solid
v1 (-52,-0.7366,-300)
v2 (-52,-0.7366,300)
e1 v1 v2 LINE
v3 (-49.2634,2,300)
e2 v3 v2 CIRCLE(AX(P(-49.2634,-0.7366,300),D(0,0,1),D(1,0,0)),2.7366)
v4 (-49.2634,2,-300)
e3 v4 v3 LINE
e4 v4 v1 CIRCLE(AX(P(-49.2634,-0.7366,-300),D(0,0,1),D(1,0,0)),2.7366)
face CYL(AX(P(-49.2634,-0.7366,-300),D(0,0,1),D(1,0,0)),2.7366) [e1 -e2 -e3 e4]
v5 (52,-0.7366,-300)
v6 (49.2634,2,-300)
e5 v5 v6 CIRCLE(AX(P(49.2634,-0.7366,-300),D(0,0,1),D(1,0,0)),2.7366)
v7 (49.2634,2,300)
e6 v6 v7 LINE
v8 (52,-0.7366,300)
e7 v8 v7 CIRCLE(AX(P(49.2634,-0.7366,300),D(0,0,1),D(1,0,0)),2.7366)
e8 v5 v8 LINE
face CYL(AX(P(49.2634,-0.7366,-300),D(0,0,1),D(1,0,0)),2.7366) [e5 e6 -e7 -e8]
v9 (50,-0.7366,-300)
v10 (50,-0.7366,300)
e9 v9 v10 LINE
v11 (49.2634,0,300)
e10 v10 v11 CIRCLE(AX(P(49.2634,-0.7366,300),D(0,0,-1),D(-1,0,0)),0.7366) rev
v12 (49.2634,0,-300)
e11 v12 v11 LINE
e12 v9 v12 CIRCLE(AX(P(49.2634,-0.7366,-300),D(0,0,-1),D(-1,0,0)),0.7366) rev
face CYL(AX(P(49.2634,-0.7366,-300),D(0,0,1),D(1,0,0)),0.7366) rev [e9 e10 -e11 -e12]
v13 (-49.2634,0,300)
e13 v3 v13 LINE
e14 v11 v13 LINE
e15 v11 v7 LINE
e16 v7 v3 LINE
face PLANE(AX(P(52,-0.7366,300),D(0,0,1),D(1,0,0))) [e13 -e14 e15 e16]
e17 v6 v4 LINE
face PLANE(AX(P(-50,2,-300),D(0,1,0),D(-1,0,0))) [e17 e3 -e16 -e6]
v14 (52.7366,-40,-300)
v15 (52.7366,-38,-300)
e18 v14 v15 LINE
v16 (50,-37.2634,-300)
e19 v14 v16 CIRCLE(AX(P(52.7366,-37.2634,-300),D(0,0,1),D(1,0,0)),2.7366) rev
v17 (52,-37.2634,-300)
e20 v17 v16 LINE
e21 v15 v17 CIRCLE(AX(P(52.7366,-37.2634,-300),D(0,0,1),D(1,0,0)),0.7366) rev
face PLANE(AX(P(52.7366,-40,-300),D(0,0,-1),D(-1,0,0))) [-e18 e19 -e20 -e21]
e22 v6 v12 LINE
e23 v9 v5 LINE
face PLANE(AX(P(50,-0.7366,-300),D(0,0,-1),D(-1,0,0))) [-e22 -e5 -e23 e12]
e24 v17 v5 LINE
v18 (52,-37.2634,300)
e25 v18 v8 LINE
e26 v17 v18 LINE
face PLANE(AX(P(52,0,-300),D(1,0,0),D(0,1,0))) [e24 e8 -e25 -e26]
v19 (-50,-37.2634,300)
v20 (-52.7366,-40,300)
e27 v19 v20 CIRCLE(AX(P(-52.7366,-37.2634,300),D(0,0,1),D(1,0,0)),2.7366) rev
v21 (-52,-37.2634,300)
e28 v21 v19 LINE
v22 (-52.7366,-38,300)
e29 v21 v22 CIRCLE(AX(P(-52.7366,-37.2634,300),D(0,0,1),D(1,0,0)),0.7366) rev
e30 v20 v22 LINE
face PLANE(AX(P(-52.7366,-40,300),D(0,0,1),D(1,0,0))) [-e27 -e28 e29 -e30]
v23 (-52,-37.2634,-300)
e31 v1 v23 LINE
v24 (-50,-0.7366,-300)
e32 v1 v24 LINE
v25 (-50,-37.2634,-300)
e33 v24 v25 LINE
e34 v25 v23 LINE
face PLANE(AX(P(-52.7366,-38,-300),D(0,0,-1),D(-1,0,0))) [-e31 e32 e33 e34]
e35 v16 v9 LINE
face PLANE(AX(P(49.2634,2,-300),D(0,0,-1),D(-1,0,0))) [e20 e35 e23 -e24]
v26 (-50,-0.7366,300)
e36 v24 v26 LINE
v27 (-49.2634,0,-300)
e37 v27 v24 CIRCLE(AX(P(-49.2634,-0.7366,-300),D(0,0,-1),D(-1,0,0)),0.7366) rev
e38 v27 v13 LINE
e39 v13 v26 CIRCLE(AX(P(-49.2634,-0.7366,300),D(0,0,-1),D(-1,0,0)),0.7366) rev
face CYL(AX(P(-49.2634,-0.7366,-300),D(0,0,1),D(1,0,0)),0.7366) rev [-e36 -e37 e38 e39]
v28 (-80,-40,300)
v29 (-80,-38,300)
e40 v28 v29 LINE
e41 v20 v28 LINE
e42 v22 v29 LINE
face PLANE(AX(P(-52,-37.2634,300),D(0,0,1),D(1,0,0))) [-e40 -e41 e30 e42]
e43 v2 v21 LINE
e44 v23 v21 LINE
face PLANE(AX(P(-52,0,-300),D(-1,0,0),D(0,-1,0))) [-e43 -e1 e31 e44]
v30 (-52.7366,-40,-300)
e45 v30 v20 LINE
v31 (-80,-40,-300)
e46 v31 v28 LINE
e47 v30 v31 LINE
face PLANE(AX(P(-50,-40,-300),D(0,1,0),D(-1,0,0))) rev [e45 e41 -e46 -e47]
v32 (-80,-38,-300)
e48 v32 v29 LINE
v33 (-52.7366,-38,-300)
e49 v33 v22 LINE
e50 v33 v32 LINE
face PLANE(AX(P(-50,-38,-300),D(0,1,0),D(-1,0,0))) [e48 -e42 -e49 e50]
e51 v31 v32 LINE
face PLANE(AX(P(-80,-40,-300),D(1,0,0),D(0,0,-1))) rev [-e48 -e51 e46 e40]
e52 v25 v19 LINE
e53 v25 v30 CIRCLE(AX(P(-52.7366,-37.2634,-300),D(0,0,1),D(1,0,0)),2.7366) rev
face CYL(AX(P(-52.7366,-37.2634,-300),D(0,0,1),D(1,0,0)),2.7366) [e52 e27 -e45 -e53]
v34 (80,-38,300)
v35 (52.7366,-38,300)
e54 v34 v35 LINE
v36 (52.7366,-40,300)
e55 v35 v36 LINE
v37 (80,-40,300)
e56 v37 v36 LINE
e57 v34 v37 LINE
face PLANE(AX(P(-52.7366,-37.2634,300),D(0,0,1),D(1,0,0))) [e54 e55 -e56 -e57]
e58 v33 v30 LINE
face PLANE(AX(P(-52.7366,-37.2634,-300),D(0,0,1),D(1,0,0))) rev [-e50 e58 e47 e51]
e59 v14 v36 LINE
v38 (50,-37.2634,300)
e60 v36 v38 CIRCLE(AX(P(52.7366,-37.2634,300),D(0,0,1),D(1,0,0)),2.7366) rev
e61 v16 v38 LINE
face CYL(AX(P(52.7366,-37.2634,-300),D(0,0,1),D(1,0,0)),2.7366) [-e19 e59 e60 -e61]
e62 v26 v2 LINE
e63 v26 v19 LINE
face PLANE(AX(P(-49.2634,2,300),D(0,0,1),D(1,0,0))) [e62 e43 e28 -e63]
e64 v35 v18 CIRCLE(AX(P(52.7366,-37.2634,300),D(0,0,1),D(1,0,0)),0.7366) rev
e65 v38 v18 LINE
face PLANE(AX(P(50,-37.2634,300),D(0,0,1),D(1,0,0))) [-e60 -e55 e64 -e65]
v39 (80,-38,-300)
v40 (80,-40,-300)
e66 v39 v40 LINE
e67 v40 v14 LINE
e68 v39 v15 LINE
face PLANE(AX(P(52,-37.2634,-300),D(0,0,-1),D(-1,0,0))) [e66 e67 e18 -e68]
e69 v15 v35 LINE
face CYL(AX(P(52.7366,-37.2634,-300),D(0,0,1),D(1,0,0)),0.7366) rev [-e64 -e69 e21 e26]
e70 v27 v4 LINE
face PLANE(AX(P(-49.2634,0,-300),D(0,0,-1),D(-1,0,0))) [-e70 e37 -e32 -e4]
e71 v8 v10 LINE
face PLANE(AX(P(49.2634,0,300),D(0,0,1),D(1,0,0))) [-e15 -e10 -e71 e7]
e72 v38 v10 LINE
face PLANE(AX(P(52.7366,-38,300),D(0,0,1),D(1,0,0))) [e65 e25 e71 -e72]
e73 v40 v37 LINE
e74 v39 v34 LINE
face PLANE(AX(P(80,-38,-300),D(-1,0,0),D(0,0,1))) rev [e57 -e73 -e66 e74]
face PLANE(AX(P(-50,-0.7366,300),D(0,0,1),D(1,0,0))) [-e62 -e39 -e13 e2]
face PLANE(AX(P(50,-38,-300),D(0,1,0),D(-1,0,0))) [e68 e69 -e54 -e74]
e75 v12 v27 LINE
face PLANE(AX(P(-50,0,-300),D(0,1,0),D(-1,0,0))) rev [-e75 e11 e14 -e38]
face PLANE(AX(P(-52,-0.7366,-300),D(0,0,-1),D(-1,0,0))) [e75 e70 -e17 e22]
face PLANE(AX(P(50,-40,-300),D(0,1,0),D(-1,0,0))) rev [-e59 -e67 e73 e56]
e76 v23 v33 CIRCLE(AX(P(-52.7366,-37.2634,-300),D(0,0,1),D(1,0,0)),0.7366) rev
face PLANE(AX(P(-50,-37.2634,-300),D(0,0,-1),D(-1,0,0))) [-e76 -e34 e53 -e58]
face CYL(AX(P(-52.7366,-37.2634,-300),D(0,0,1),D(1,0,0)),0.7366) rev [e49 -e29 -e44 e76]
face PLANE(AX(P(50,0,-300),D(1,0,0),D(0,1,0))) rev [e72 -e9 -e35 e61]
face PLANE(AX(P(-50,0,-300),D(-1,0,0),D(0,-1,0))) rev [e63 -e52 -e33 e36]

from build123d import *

# Parameters (mm, degrees)
BASE_FLANGE1_DEPTH = 300


# Sheet-metal steps are written as plain solids
with BuildPart() as part:
    # Sketch1 → Base-Flange1 (new, symmetric)
    with BuildSketch(Plane.XY):
        with BuildLine():
            Line((-80, -40), (-52.7366, -40))
            ThreePointArc((-52.7366, -40), (-50.801531583, -39.198468417), (-50, -37.2634))
            Line((-50, -37.2634), (-50, -0.7366))
            ThreePointArc((-50, -0.7366), (-49.784254855, -0.215745145), (-49.2634, 0))
            Line((-49.2634, 0), (49.2634, 0))
            ThreePointArc((49.2634, 0), (49.784254855, -0.215745145), (50, -0.7366))
            Line((50, -0.7366), (50, -37.2634))
            ThreePointArc((50, -37.2634), (50.801531583, -39.198468417), (52.7366, -40))
            Line((52.7366, -40), (80, -40))
            Line((80, -40), (80, -38))
            Line((80, -38), (52.7366, -38))
            ThreePointArc((52.7366, -38), (52.215745145, -37.784254855), (52, -37.2634))
            Line((52, -37.2634), (52, -0.7366))
            ThreePointArc((52, -0.7366), (51.198468417, 1.198468417), (49.2634, 2))
            Line((49.2634, 2), (-49.2634, 2))
            ThreePointArc((-49.2634, 2), (-51.198468417, 1.198468417), (-52, -0.7366))
            Line((-52, -0.7366), (-52, -37.2634))
            ThreePointArc((-52, -37.2634), (-52.215745145, -37.784254855), (-52.7366, -38))
            Line((-52.7366, -38), (-80, -38))
            Line((-80, -38), (-80, -40))
        make_face()
    extrude(amount=BASE_FLANGE1_DEPTH, both=True)


solid = part.part
